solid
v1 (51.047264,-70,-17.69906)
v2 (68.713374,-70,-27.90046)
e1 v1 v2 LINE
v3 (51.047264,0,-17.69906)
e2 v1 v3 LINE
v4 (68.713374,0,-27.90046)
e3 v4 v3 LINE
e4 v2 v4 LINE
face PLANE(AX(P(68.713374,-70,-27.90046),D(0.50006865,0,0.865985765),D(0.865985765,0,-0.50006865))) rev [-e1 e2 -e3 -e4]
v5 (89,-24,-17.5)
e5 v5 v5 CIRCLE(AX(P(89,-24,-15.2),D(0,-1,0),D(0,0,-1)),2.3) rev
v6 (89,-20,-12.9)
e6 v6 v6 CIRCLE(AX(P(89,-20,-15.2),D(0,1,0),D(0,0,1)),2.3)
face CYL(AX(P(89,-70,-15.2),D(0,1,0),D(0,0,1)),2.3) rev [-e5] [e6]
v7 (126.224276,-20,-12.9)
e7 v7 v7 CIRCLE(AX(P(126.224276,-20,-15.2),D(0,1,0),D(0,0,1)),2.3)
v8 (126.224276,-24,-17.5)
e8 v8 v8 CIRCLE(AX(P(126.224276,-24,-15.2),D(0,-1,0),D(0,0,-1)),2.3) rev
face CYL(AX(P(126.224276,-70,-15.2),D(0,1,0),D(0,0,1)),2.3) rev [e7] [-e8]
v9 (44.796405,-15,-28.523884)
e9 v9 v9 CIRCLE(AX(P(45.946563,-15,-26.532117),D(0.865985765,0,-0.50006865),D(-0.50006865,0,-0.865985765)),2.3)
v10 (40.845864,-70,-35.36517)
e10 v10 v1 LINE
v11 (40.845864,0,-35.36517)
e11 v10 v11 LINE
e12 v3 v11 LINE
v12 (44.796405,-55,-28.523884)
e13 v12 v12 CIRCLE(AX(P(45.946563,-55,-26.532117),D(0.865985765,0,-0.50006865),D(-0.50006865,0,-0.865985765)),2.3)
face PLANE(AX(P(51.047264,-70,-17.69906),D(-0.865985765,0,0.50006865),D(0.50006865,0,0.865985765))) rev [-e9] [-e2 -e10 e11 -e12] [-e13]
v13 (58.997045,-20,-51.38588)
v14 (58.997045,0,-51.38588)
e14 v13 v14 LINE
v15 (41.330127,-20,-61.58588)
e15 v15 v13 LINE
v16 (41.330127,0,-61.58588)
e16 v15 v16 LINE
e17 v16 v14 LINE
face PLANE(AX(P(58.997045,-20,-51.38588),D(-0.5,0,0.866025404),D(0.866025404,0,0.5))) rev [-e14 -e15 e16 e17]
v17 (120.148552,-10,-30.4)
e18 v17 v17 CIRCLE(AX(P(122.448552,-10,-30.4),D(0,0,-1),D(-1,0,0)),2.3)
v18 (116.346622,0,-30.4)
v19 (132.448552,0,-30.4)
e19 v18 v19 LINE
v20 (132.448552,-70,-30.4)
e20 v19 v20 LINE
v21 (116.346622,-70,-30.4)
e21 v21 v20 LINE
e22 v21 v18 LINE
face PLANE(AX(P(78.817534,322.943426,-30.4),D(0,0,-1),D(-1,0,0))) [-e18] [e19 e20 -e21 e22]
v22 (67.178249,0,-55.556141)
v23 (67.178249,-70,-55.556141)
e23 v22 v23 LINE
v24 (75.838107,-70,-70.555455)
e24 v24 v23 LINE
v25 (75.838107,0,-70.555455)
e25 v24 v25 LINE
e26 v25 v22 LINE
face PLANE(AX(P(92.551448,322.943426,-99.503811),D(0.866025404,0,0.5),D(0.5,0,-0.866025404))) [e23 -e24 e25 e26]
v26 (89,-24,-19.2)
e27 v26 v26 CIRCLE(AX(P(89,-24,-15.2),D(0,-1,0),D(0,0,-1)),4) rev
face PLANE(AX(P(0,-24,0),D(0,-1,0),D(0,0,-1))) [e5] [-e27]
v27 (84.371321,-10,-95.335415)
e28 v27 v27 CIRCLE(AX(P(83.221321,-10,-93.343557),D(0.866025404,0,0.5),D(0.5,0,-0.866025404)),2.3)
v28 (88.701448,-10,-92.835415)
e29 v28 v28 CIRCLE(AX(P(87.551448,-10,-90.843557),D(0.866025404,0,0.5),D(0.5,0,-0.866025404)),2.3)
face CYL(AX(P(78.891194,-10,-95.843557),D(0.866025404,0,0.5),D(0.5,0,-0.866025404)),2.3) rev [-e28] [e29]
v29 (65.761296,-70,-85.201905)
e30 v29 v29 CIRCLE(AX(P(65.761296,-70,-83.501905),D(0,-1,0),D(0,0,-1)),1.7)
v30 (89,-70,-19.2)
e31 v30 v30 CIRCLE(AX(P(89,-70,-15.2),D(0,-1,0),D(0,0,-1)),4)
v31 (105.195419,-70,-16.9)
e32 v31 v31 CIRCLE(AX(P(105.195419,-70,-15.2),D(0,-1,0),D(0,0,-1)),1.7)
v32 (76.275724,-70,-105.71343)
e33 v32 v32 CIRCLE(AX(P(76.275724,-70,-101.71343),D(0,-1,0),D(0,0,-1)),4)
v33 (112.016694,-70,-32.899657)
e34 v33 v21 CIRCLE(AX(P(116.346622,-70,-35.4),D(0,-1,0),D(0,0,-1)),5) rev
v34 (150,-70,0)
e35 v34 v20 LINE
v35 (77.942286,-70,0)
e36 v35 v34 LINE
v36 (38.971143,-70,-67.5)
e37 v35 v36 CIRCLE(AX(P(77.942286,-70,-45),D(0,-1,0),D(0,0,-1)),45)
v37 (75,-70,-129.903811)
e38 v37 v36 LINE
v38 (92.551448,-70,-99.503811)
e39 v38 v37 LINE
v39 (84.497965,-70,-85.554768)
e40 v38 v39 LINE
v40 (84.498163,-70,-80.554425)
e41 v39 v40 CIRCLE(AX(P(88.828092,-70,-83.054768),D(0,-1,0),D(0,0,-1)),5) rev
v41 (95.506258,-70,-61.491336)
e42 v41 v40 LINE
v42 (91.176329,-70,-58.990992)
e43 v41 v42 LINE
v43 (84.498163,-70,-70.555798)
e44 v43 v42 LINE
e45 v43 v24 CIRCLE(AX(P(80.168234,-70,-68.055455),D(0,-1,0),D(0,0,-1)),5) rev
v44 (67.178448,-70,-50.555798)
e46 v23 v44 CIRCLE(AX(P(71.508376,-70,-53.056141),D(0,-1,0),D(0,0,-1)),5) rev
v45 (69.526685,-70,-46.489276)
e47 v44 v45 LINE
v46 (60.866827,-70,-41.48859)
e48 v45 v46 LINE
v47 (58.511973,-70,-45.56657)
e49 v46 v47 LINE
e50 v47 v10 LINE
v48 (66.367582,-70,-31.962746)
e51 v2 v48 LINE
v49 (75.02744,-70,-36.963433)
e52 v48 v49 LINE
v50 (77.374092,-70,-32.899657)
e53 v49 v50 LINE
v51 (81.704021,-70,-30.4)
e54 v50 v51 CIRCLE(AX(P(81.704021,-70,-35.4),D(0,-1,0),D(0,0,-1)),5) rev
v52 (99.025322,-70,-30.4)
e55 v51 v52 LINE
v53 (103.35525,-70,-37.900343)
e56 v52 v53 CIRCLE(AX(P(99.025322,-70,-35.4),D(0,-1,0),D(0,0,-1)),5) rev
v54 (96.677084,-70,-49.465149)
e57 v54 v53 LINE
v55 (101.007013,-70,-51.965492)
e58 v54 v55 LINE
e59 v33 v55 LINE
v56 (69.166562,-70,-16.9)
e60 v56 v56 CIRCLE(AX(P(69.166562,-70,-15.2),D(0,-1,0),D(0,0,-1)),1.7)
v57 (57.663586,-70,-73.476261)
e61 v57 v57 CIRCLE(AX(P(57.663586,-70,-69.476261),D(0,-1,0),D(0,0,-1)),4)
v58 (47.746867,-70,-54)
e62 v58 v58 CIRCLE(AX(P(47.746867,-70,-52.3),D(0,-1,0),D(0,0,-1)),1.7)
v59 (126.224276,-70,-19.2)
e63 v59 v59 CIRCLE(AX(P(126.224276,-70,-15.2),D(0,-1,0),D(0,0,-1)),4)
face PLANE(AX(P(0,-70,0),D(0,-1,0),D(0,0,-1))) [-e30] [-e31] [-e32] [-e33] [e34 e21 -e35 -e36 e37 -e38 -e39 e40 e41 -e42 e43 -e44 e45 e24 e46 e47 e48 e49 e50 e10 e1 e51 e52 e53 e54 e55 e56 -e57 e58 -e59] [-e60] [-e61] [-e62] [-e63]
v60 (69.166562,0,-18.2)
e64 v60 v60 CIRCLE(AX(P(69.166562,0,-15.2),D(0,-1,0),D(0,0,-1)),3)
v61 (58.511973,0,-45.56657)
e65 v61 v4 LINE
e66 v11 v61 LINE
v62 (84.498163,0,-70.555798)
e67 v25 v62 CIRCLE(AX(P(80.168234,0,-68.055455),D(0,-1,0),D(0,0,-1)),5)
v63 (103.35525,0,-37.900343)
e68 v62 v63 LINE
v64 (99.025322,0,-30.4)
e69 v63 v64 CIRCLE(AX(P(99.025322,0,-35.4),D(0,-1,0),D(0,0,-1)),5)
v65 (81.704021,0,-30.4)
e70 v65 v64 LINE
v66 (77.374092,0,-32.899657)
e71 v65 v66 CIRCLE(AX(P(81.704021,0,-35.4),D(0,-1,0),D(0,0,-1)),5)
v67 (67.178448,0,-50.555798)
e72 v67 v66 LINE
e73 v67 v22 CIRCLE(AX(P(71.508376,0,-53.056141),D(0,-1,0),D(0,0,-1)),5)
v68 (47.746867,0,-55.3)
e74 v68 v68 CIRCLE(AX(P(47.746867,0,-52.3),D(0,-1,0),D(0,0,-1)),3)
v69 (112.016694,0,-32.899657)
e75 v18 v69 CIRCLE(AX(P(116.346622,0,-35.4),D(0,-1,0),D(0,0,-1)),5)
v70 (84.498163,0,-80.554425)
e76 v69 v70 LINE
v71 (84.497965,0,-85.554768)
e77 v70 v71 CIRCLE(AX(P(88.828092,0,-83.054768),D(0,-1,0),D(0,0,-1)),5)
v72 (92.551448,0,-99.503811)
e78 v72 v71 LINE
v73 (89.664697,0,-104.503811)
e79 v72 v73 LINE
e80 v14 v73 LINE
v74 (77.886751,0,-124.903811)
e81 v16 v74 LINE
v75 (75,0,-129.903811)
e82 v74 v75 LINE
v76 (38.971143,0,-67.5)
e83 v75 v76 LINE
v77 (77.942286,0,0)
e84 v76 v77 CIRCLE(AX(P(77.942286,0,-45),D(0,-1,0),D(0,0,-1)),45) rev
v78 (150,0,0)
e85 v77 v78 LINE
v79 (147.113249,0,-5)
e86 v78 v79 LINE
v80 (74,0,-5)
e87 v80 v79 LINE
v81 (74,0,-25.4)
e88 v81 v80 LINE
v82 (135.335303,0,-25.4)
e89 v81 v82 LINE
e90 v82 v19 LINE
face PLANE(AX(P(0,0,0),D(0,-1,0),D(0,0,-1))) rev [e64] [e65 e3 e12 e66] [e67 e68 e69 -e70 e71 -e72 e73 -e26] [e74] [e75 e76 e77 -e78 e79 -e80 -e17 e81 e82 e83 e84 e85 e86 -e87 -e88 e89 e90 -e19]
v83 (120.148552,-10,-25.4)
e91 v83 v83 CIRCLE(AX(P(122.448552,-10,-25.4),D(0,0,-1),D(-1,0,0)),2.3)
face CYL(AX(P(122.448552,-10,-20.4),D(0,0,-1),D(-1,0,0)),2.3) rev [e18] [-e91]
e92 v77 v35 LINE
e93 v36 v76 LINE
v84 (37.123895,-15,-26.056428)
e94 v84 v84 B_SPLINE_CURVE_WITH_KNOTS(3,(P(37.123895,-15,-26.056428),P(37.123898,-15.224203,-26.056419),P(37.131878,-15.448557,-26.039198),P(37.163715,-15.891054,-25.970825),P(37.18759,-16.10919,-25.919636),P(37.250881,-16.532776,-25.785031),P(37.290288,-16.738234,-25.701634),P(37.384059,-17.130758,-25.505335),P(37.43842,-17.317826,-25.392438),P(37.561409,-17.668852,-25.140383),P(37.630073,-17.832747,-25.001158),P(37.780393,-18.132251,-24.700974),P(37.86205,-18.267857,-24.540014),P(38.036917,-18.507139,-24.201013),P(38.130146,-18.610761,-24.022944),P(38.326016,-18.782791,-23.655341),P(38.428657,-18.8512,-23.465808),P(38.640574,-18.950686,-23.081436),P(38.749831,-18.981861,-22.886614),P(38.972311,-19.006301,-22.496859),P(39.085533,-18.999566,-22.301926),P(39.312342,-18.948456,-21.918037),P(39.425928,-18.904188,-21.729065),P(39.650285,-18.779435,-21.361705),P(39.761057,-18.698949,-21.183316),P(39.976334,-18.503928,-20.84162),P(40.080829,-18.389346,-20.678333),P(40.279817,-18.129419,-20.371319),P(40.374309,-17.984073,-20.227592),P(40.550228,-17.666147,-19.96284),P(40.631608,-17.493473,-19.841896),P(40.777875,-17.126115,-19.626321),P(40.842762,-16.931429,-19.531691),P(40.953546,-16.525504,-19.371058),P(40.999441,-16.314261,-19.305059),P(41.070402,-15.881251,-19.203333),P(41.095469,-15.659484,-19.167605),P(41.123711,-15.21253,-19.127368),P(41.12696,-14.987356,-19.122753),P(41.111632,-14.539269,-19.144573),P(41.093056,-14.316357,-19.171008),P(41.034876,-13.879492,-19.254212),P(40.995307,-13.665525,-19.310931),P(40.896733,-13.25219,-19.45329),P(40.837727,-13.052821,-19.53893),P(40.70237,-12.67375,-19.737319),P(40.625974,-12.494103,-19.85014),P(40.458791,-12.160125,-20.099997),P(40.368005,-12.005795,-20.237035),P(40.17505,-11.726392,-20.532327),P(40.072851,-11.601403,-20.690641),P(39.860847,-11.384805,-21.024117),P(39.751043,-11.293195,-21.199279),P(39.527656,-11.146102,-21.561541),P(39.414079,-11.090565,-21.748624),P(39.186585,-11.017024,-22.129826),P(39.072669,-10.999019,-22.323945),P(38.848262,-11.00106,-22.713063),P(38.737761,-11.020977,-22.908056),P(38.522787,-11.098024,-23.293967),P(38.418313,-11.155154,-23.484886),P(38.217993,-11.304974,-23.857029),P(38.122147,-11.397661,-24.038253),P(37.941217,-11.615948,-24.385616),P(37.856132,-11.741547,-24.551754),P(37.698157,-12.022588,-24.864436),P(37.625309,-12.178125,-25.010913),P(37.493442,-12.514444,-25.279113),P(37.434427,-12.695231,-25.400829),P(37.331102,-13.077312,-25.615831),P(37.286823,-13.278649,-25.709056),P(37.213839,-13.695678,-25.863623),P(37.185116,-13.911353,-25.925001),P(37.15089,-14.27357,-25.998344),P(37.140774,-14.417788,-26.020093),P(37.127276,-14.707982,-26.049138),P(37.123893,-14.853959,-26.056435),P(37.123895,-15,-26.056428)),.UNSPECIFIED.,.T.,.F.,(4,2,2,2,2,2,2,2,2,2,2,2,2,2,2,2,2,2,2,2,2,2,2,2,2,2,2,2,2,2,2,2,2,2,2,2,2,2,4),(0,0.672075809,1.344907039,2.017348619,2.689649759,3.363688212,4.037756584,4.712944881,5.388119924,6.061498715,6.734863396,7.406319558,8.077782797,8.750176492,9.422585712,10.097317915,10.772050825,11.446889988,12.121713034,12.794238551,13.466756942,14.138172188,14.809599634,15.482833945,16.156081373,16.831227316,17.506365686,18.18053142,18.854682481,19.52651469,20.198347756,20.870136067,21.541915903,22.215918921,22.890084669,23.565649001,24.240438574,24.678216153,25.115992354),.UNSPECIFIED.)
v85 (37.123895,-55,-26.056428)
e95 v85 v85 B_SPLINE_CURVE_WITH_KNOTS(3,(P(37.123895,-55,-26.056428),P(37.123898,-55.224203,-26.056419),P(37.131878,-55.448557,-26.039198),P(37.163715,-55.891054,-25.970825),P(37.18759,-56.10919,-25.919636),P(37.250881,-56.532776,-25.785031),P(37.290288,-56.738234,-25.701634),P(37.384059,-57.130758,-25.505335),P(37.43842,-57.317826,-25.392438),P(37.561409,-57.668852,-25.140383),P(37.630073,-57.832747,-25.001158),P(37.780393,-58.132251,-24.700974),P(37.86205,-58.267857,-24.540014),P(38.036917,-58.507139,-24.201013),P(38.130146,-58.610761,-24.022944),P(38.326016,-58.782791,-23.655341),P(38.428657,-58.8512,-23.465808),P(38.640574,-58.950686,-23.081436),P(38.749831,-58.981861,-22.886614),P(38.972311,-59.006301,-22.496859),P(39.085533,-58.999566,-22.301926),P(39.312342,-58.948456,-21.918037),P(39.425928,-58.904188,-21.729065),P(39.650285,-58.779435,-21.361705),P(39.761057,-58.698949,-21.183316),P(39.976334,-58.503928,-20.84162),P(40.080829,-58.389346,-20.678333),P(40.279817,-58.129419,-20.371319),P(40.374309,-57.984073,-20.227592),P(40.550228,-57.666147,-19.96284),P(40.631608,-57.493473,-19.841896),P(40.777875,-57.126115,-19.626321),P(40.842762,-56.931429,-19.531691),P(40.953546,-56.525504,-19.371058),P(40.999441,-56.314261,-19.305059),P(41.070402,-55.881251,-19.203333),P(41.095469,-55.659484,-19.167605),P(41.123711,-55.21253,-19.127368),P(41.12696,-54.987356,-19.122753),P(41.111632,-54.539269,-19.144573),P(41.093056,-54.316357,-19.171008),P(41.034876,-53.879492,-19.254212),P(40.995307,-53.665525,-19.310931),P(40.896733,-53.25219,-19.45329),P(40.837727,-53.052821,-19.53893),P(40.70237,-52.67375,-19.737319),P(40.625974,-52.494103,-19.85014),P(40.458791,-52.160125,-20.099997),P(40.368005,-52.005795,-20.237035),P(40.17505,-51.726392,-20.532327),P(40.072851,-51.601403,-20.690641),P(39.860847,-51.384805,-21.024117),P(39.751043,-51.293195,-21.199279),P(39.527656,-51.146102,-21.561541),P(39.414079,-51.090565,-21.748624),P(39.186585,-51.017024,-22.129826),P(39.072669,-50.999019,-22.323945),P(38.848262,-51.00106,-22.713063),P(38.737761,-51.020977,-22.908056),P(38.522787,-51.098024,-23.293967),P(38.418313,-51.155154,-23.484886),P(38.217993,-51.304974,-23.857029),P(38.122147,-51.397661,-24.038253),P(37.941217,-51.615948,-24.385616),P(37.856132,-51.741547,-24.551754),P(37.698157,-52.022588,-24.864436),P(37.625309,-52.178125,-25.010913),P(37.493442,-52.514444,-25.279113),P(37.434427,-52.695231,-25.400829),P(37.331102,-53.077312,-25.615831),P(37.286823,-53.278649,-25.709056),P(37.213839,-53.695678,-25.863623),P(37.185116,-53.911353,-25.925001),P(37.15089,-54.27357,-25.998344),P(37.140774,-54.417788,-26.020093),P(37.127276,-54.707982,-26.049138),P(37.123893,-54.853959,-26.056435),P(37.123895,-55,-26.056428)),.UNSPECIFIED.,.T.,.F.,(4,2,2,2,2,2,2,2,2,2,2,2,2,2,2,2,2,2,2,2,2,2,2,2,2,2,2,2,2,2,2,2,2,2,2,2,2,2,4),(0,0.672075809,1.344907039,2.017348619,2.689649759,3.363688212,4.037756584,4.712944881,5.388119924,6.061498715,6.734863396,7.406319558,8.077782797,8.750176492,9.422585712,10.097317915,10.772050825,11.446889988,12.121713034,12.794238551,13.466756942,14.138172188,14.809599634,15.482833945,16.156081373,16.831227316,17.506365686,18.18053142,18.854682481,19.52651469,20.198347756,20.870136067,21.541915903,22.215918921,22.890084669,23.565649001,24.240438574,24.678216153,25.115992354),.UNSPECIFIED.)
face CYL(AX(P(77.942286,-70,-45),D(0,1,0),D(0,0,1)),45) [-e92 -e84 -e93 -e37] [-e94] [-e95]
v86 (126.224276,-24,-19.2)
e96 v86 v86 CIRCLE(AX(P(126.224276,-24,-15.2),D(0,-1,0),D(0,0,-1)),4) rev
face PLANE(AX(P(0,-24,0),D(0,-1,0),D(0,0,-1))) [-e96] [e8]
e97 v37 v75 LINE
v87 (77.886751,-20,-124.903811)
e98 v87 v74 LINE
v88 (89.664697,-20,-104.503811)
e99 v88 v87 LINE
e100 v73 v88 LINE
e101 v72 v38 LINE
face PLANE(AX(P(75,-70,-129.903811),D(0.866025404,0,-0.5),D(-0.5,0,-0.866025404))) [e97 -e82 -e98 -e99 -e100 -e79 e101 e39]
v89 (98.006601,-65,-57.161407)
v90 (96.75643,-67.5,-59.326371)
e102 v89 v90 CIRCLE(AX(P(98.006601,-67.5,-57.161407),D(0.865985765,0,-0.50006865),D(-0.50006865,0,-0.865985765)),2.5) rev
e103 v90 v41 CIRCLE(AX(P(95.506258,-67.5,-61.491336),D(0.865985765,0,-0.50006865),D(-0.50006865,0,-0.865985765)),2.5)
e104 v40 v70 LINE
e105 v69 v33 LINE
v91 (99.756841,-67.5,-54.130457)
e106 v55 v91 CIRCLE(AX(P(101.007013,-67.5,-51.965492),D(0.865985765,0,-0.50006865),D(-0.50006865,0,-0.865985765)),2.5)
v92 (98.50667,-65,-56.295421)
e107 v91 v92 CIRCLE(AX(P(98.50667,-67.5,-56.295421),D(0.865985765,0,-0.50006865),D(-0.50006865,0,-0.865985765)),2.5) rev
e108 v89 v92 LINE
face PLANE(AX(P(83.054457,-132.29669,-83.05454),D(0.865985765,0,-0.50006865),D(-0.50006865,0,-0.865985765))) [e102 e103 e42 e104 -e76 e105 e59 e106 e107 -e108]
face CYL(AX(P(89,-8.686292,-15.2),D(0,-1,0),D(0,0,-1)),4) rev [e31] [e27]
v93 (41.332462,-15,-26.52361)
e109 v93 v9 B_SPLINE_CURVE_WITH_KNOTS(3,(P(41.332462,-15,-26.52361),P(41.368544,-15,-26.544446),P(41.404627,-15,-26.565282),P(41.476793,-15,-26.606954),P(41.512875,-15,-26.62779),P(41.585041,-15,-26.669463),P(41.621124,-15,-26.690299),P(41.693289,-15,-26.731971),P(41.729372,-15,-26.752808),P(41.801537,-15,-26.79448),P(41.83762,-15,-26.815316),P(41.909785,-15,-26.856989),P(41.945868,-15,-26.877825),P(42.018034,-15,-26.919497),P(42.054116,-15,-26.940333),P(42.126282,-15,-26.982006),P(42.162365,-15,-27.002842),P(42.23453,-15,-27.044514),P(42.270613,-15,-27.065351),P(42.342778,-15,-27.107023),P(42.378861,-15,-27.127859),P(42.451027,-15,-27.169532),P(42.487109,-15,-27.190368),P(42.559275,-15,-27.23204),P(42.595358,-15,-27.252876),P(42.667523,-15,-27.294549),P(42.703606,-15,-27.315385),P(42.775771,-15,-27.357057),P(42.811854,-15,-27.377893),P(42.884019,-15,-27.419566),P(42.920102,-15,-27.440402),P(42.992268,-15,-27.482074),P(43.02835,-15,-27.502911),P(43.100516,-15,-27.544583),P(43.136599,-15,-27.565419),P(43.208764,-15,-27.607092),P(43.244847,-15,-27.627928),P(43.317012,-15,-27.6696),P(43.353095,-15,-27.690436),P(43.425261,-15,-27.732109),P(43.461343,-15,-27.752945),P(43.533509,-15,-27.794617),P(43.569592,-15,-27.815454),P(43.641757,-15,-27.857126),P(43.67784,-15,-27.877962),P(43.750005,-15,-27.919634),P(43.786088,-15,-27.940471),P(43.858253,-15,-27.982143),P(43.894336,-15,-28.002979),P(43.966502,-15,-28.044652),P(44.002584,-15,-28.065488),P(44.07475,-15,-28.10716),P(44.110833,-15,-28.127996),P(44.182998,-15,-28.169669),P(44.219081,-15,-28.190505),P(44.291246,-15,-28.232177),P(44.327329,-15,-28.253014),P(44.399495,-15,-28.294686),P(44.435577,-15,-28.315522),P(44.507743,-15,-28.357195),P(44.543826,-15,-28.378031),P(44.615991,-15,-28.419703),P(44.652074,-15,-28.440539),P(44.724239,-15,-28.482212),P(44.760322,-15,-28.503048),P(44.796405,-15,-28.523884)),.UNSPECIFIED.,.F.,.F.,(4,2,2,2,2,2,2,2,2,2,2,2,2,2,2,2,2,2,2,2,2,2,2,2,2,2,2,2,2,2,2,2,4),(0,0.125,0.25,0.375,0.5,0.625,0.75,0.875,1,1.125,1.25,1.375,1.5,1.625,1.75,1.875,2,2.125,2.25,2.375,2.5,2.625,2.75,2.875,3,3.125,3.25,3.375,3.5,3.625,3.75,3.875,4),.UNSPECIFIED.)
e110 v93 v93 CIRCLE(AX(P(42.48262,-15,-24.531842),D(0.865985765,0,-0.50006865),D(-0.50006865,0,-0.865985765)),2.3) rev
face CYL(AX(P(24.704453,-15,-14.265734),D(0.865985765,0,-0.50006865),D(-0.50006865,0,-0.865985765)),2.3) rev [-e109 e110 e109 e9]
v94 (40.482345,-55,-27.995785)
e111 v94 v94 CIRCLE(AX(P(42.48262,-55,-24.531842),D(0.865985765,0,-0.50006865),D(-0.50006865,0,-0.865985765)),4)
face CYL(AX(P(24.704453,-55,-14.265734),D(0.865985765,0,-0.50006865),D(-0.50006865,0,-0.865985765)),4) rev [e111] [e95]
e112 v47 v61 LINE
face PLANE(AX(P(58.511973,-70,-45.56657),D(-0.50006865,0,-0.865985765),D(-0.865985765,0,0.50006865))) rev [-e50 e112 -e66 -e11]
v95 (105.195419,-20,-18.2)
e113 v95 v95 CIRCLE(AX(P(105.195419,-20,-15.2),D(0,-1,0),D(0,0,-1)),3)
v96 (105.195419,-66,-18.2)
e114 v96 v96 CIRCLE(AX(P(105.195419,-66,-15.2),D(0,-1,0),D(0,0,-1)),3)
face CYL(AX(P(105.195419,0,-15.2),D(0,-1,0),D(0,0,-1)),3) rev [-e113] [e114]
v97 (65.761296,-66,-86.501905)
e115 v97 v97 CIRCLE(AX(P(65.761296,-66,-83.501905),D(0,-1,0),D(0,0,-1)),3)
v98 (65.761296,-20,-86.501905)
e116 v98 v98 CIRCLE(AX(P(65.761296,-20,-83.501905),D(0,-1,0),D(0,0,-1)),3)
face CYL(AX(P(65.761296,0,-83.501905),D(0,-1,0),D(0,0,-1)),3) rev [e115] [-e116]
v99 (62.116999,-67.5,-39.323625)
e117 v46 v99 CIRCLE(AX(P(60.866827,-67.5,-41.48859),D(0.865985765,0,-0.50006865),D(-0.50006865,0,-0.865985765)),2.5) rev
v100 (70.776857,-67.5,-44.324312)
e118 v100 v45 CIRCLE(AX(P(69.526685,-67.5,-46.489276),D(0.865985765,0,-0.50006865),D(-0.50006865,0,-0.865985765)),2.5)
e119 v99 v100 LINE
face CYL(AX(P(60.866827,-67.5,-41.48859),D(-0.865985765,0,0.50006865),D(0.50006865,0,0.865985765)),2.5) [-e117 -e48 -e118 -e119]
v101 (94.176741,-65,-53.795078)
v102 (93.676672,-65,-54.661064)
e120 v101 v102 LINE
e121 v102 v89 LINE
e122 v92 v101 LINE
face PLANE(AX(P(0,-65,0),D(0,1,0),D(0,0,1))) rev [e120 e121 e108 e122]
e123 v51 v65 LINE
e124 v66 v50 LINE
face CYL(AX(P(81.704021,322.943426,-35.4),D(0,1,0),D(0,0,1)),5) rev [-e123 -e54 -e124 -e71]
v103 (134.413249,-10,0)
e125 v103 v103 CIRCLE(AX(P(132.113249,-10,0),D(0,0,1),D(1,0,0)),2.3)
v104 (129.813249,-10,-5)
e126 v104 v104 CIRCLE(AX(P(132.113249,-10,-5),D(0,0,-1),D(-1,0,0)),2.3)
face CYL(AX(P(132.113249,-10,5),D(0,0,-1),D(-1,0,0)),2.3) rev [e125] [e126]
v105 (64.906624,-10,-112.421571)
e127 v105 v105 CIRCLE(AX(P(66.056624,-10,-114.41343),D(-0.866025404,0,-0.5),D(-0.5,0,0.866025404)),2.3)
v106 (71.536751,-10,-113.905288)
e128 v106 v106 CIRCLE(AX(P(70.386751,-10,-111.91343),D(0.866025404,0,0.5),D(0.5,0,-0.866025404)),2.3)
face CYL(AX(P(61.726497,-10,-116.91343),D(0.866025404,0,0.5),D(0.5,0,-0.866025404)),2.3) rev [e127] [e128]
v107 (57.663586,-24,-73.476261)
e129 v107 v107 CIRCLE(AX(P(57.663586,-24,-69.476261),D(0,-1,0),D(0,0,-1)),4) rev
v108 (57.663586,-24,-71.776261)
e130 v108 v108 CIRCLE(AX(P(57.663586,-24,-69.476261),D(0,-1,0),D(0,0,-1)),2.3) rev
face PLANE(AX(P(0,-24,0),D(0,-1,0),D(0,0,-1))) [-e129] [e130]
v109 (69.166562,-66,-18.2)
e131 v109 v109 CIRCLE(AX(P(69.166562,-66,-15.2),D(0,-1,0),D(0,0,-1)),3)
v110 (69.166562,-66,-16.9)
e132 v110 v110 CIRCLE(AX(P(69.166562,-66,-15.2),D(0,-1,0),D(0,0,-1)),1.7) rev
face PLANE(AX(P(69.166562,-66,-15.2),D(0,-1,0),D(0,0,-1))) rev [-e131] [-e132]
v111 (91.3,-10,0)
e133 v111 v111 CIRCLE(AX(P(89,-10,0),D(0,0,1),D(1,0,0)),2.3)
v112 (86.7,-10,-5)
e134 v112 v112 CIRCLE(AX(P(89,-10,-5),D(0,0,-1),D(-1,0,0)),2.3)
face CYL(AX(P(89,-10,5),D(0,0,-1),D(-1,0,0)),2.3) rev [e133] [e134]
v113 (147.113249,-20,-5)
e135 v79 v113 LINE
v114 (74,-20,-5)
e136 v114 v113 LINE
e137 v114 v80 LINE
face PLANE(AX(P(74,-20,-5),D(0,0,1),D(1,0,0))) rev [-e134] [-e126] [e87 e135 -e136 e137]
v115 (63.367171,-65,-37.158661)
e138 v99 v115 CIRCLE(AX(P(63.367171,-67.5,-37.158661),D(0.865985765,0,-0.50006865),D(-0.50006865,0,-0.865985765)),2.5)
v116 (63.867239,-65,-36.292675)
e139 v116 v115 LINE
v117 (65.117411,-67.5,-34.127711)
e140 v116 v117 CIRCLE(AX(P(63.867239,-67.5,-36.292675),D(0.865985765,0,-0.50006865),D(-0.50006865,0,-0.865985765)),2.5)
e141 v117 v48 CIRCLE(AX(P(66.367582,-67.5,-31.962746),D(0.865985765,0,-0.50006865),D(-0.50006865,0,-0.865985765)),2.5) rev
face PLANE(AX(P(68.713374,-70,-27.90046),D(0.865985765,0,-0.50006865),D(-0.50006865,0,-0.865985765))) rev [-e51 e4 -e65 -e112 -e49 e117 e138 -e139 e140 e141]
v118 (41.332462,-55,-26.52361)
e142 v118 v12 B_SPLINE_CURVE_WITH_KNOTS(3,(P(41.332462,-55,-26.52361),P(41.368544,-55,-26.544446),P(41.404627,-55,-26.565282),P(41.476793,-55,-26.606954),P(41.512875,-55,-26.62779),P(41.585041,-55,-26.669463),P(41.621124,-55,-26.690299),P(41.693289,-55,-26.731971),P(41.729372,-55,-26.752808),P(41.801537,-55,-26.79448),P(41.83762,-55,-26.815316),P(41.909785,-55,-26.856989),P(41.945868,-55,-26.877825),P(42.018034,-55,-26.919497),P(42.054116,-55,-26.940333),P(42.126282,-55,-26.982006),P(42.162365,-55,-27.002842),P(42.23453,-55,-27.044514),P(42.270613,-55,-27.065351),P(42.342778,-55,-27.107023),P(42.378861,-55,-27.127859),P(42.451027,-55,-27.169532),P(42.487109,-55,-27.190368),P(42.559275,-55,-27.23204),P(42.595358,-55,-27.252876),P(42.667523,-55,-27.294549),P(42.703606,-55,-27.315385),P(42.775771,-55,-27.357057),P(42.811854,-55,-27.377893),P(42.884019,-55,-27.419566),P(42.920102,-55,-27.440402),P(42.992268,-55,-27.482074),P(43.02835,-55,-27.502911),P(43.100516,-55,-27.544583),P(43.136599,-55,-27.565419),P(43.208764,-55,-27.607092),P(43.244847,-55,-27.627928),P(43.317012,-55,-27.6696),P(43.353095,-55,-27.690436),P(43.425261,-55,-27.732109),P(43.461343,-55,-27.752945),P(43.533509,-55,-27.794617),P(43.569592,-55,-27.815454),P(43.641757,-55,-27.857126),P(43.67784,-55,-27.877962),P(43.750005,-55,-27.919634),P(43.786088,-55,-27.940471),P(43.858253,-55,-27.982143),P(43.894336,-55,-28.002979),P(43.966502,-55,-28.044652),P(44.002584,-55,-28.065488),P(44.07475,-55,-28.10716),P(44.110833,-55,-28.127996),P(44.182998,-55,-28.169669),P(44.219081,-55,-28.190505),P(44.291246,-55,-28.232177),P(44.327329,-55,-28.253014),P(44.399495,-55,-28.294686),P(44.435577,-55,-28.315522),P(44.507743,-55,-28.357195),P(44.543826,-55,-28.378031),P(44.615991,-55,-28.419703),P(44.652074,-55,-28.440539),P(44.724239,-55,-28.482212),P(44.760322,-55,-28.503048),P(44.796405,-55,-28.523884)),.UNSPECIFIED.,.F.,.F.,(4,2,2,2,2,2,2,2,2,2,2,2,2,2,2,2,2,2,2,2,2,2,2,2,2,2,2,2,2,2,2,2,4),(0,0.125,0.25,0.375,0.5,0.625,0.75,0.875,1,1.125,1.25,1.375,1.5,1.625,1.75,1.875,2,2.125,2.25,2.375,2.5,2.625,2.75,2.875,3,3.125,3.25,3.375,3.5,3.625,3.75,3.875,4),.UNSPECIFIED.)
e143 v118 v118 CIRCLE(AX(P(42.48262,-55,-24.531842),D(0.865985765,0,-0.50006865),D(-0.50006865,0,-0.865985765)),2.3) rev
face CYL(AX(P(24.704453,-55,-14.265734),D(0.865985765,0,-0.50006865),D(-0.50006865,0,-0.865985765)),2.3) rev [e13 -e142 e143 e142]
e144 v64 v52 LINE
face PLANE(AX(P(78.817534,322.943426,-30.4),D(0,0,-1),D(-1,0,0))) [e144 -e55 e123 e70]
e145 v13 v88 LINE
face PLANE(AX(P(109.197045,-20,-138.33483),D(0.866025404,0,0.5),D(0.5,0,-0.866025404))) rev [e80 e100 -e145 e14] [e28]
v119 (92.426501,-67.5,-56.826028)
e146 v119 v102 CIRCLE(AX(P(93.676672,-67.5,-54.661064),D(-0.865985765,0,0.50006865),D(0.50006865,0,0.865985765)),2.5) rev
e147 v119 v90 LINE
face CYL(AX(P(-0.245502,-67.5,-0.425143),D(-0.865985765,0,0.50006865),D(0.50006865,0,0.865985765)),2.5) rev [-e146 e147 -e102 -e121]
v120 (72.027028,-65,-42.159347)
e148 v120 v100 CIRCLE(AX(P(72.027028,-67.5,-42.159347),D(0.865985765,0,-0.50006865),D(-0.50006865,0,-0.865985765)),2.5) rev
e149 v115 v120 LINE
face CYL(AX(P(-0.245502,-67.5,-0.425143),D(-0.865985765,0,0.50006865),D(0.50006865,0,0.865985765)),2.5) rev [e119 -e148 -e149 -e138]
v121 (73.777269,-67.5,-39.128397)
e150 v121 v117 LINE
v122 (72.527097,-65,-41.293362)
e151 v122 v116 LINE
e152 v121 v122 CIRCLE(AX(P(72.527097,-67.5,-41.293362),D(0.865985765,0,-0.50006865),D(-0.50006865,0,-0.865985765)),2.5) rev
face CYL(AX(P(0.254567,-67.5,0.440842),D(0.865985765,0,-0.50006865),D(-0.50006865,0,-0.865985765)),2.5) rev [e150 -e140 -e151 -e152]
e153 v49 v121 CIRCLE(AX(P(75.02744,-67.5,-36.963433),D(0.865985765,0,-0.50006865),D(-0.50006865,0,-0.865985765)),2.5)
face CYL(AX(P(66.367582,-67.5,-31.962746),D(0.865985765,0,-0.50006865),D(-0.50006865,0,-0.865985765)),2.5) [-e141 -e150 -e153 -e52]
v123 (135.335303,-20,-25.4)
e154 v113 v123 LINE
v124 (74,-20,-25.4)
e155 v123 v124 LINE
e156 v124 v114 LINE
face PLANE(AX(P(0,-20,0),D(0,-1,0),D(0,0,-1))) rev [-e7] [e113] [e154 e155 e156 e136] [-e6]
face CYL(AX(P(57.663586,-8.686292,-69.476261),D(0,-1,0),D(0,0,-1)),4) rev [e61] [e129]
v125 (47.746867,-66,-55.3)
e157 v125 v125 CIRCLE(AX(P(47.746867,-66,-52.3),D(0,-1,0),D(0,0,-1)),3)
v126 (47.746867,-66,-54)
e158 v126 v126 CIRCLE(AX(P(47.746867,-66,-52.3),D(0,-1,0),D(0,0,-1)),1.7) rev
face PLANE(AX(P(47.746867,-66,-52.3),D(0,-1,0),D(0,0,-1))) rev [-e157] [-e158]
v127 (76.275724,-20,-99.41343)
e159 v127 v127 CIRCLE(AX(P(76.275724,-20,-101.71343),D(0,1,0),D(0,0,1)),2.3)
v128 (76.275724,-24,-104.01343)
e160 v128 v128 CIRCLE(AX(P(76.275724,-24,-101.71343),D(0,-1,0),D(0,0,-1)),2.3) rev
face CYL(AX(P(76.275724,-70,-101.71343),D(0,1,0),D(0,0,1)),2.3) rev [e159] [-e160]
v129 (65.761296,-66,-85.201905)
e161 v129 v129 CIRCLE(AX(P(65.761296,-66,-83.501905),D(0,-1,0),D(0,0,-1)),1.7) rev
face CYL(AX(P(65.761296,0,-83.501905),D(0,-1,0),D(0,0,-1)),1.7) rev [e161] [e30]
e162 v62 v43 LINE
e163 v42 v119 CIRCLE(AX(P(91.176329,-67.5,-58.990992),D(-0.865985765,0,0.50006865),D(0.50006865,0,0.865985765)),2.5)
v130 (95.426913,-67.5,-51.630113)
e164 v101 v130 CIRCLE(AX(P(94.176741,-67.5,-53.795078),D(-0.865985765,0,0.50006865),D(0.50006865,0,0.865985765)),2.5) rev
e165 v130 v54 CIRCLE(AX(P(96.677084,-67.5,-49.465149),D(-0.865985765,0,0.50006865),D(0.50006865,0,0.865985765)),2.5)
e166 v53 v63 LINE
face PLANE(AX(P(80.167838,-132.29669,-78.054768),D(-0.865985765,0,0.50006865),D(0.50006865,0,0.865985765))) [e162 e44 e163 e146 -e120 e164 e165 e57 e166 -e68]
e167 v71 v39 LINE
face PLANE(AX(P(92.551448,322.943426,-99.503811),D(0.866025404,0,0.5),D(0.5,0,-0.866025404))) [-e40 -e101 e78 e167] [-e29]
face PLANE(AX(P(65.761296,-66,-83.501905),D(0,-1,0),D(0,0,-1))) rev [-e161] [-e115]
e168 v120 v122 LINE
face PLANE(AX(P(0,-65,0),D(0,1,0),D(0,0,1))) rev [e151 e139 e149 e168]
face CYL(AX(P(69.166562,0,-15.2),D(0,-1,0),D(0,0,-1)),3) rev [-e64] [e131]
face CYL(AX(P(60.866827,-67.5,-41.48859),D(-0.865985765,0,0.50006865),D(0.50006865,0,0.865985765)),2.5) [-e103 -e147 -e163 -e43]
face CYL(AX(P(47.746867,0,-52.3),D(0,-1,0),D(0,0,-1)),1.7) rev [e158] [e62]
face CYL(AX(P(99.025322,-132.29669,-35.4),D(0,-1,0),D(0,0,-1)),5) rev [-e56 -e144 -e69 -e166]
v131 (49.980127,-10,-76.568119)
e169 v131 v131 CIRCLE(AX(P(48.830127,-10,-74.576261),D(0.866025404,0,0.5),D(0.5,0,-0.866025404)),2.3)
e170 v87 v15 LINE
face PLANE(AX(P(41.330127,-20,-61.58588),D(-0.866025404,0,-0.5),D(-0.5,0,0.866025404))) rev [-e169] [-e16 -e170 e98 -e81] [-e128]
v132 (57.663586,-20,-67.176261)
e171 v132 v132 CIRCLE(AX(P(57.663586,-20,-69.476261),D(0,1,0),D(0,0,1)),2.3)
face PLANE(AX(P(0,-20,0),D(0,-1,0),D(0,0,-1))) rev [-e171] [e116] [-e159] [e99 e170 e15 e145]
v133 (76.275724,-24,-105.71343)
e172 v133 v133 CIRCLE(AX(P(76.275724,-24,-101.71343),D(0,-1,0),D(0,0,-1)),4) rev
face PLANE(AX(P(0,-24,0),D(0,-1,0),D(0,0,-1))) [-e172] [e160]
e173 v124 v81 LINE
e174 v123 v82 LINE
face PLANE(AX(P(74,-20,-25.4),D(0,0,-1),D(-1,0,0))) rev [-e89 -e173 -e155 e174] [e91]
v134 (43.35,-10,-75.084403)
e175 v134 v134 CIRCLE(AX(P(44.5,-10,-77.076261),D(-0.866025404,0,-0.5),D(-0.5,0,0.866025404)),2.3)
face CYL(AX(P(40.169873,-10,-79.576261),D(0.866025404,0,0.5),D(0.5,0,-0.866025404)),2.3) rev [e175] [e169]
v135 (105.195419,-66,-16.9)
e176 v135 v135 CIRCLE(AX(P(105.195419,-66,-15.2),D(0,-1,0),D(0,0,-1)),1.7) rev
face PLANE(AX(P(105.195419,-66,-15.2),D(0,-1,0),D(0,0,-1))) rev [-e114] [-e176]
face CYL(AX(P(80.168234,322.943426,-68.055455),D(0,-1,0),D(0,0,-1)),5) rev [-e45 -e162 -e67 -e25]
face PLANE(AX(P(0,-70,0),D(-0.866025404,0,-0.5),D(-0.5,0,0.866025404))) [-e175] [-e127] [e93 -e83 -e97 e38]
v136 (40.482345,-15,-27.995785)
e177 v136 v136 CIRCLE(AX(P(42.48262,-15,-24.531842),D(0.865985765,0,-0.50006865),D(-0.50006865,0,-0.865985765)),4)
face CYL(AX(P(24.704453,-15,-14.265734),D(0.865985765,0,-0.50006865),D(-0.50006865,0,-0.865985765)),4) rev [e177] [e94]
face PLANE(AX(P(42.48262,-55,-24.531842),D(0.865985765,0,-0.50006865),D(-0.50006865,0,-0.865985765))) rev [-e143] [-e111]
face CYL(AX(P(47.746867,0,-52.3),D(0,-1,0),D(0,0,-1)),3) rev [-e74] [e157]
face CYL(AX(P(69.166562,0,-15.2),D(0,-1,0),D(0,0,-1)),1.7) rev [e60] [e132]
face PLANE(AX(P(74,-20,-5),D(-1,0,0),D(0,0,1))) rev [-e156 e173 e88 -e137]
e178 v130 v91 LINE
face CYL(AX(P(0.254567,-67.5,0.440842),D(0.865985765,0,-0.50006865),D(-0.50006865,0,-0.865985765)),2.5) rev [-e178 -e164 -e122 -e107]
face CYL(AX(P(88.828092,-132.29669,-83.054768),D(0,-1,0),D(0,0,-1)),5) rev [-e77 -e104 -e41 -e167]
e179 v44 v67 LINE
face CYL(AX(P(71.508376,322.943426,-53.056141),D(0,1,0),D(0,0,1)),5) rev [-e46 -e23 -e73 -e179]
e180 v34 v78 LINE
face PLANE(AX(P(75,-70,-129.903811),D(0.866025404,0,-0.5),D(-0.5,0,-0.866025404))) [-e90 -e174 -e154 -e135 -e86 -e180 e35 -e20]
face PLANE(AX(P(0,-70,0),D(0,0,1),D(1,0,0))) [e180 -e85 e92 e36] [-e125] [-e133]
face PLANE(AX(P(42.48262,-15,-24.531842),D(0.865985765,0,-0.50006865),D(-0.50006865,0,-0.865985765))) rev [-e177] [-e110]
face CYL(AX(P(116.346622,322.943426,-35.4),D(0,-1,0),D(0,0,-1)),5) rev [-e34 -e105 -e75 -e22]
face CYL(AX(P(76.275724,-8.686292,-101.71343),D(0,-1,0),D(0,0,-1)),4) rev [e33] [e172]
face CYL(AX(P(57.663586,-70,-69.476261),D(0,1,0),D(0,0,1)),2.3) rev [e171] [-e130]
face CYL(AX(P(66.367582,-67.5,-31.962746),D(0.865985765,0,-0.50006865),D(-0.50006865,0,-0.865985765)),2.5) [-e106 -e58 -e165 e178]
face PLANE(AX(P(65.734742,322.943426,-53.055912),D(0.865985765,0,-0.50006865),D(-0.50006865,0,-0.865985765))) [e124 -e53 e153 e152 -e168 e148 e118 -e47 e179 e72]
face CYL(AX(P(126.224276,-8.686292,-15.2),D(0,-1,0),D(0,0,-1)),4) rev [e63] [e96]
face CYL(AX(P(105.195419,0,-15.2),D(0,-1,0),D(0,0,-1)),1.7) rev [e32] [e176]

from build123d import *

# Parameters (mm, degrees)
BOSS_EXTRUDE1_DEPTH      = 70
CUT_EXTRUDE2_DEPTH       = 211.416254125
CUT_EXTRUDE2_DEPTH_BACK  = 211.416254125
SKETCH2_W                = 100.4
SKETCH2_H                = 20.4
CUT_EXTRUDE3_DEPTH       = 20
FILLET1_R                = 45
CUT_EXTRUDE4_DEPTH       = 211.416254125
CUT_EXTRUDE4_DEPTH_BACK  = 211.416254125
BOSS_EXTRUDE2_DEPTH      = 70
SKETCH33_R               = 2.3
CUT_EXTRUDE9_DEPTH       = 10
SKETCH34_R               = 2.3
CUT_EXTRUDE10_DEPTH      = 10
FILLET2_R                = 5
CUT_EXTRUDE6_DEPTH       = 5
FILLET3_START            = 72
FILLET3_DEPTH            = 42
FILLET3_START_2          = 73.456949031
FILLET3_2_DEPTH          = 10
FILLET3_START_3          = 108.456949031
FILLET3_3_DEPTH          = 5
SKETCH31_R               = 2.3
CUT_EXTRUDE7_DEPTH       = 10
SKETCH32_R               = 2.3
CUT_EXTRUDE8_DEPTH       = 10
SKETCH35_R               = 2.3
CUT_EXTRUDE11_DEPTH      = 163.520229183
SKETCH36_R               = 4
CUT_EXTRUDE12_DEPTH      = 167.02180224
CUT_EXTRUDE13_DEPTH      = 211.416254158
CUT_EXTRUDE13_DEPTH_BACK = 211.416254158
SKETCH37_R               = 1.7
SKETCH38_R               = 2.3
CUT_EXTRUDE14_DEPTH      = 205.633819321
SKETCH39_R               = 4
CUT_EXTRUDE15_DEPTH      = 46
SKETCH40_R               = 3
CUT_EXTRUDE16_DEPTH      = 210.119583046


with BuildPart() as part:
    # Sketch1 → Boss-Extrude1 (new body)
    with BuildSketch(Plane(origin=(0, 0, 0), x_dir=(1, 0, 0), z_dir=(0, 1, 0))):
        Polygon((0, 0), (150, 0), (75, 129.903810568), align=None)
    extrude(amount=-BOSS_EXTRUDE1_DEPTH)

    # Sketch4 → Cut-Extrude2 (cut, two sides: drawn at the far end of the back side and taken through both)
    with BuildSketch(Plane(origin=(0, 0, 0), x_dir=(1, 0, 0), z_dir=(0, 1, 0)).offset(-CUT_EXTRUDE2_DEPTH_BACK)):
        Polygon((58.511973189, 45.566570047), (40.845863577, 35.365169595), (51.047264029, 17.699059984), (68.713373641, 27.900460435), align=None)
    extrude(amount=CUT_EXTRUDE2_DEPTH + CUT_EXTRUDE2_DEPTH_BACK, mode=Mode.SUBTRACT)

    # Sketch2 → Cut-Extrude3 (cut)
    with BuildSketch(Plane(origin=(0, 0, 0), x_dir=(1, 0, 0), z_dir=(0, 1, 0))):
        Polygon((109.197045256, 138.33483042), (58.997045256, 51.38587988), (41.330127019, 61.58587988), (91.530127019, 148.53483042), align=None)
        with Locations((124.2, 15.2)):
            Rectangle(SKETCH2_W, SKETCH2_H)
    extrude(amount=-CUT_EXTRUDE3_DEPTH, mode=Mode.SUBTRACT)

    # Fillet1
    fillet1_edges = [part.edges().sort_by_distance(p)[0] for p in [
        (0, -35, 0),
    ]]
    fillet(fillet1_edges, radius=FILLET1_R)

    # Sketch27 → Cut-Extrude4 (cut, two sides: drawn at the far end of the back side and taken through both)
    with BuildSketch(Plane(origin=(0, 0, 0), x_dir=(1, 0, 0), z_dir=(0, 1, 0)).offset(-CUT_EXTRUDE4_DEPTH_BACK)):
        Polygon((238.272822489, 351.900634614), (92.551448183, 99.503810568), (65.734741667, 53.05591239), (78.81753352, 30.4), (132.448551817, 30.4), (423.891300428, 30.4), (928.68494852, 321.842748611), (743.066470581, 643.343383225), align=None)
    extrude(amount=CUT_EXTRUDE4_DEPTH + CUT_EXTRUDE4_DEPTH_BACK, mode=Mode.SUBTRACT)

    # Sketch28 → Boss-Extrude2 (add)
    with BuildSketch(Plane(origin=(0, 0, 0), x_dir=(1, 0, 0), z_dir=(0, 1, 0))):
        Polygon((83.054457118, 83.054539524), (113.460135283, 30.4), (107.686368323, 30.4), (80.167837876, 78.054768335), align=None)
    extrude(amount=-BOSS_EXTRUDE2_DEPTH)

    # Sketch33 → Cut-Extrude9 (cut)
    with BuildSketch(Plane(origin=(26.327172275, 0, 15.2), x_dir=(0.4999999999999997, 0, -0.8660254037844388), z_dir=(0.8660254037844389, 0, 0.49999999999999983))):
        with Locations((122.448551817, -10)):
            Circle(SKETCH33_R)
    extrude(amount=-CUT_EXTRUDE9_DEPTH, mode=Mode.SUBTRACT)

    # Sketch34 → Cut-Extrude10 (cut)
    with BuildSketch(Plane(origin=(0, 0, -30.4), x_dir=(-1, 0, 0), z_dir=(0, 0, -1))):
        with Locations((-122.448551817, -10)):
            Circle(SKETCH34_R)
    extrude(amount=-CUT_EXTRUDE10_DEPTH, mode=Mode.SUBTRACT)

    # Fillet2
    fillet2_edges = [part.edges().sort_by_distance(p)[0] for p in [
        (83.054457118, -35, -83.054539524),
        (80.167837876, -35, -78.054768335),
        (65.734741667, -35, -53.05591239),
        (78.81753352, -35, -30.4),
        (107.686368323, -35, -30.4),
        (113.460135283, -35, -30.4),
    ]]
    fillet(fillet2_edges, radius=FILLET2_R)

    # Sketch30 → Cut-Extrude6 (cut)
    with BuildSketch(Plane.XZ.offset(70)):
        Polygon((62.116998953, -39.323625207), (122.736002524, -74.32843068), (125.736414421, -69.132516088), (65.117410851, -34.127710616), align=None)
    extrude(amount=-CUT_EXTRUDE6_DEPTH, mode=Mode.SUBTRACT)

    # Fillet3: read off the stored shape, not the designer's step
    # Fillet3 outline → Fillet3 (cut)
    with BuildSketch(Plane(origin=(0, 0, 0), x_dir=(0.5000686496051991, 0, 0.8659857652883406), z_dir=(0.8659857652883404, 0, -0.5000686496051993)).offset(FILLET3_START)):
        with BuildLine():
            Line((-2.990935885, 70), (-5.490935885, 70))
            ThreePointArc((-5.490935885, 70), (-3.723168932, 69.267766953), (-2.990935885, 67.5))
            Line((-2.990935885, 67.5), (-2.990935885, 70))
        make_face()
        with BuildLine():
            Line((5.509064115, 70), (3.009064115, 70))
            Line((3.009064115, 70), (3.009064115, 67.5))
            ThreePointArc((3.009064115, 67.5), (3.741297162, 69.267766953), (5.509064115, 70))
        make_face()
    extrude(amount=FILLET3_DEPTH, mode=Mode.SUBTRACT)

    # Fillet3 2 outline → Fillet3 2 (add)
    with BuildSketch(Plane(origin=(0, 0, 0), x_dir=(0.5000686496051991, 0, 0.8659857652883406), z_dir=(0.8659857652883404, 0, -0.5000686496051993)).offset(FILLET3_START_2)):
        with BuildLine():
            ThreePointArc((-0.490935885, 65), (-2.258702838, 65.732233047), (-2.990935885, 67.5))
            Line((-2.990935885, 67.5), (-2.990935885, 65))
            Line((-2.990935885, 65), (-0.490935885, 65))
        make_face()
        with BuildLine():
            ThreePointArc((3.009064115, 67.5), (2.276831068, 65.732233047), (0.509064115, 65))
            Line((0.509064115, 65), (3.009064115, 65))
            Line((3.009064115, 65), (3.009064115, 67.5))
        make_face()
    extrude(amount=FILLET3_2_DEPTH)

    # Fillet3 3 outline → Fillet3 3 (add)
    with BuildSketch(Plane(origin=(0, 0, 0), x_dir=(0.5000686496051991, 0, 0.8659857652883406), z_dir=(0.8659857652883404, 0, -0.5000686496051993)).offset(FILLET3_START_3)):
        with BuildLine():
            ThreePointArc((-0.490935885, 65), (-2.258702838, 65.732233047), (-2.990935885, 67.5))
            Line((-2.990935885, 67.5), (-2.990935885, 65))
            Line((-2.990935885, 65), (-0.490935885, 65))
        make_face()
        with BuildLine():
            ThreePointArc((3.009064115, 67.5), (2.276831068, 65.732233047), (0.509064115, 65))
            Line((0.509064115, 65), (3.009064115, 65))
            Line((3.009064115, 65), (3.009064115, 67.5))
        make_face()
    extrude(amount=FILLET3_3_DEPTH)

    # Sketch31 → Cut-Extrude7 (cut)
    with BuildSketch(Plane(origin=(4.330127019, 0, 2.5), x_dir=(0.5000000000000019, 0, -0.8660254037844376), z_dir=(0.8660254037844376, 0, 0.5000000000000019))):
        with Locations((89, -10)):
            Circle(SKETCH31_R)
        with Locations((132.113248654, -10)):
            Circle(SKETCH31_R)
    extrude(amount=-CUT_EXTRUDE7_DEPTH, mode=Mode.SUBTRACT)

    # Sketch32 → Cut-Extrude8 (cut)
    with BuildSketch(Plane(origin=(0, 0, -5), x_dir=(-1, 0, 0), z_dir=(0, 0, -1))):
        with Locations((-132.113248654, -10)):
            Circle(SKETCH32_R)
        with Locations((-89, -10)):
            Circle(SKETCH32_R)
    extrude(amount=-CUT_EXTRUDE8_DEPTH, mode=Mode.SUBTRACT)

    # Sketch35 → Cut-Extrude11 (cut, through all)
    with BuildSketch(Plane(origin=(45.946562611, 0, -26.532116854), x_dir=(-0.5000686496051995, 0, -0.8659857652883403), z_dir=(0.8659857652883401, 0, -0.5000686496051994))):
        with Locations((0, -15)):
            Circle(SKETCH35_R)
        with Locations((0, -55)):
            Circle(SKETCH35_R)
    extrude(amount=-CUT_EXTRUDE11_DEPTH, mode=Mode.SUBTRACT)

    # Sketch36 → Cut-Extrude12 (cut, through all)
    with BuildSketch(Plane(origin=(42.482619549, 0, -24.531842256), x_dir=(-0.5000686496051995, 0, -0.8659857652883403), z_dir=(0.8659857652883401, 0, -0.5000686496051994))):
        with Locations((0, -15)):
            Circle(SKETCH36_R)
        with Locations((0, -55)):
            Circle(SKETCH36_R)
    extrude(amount=-CUT_EXTRUDE12_DEPTH, mode=Mode.SUBTRACT)

    # Sketch37 → Cut-Extrude13 (cut, two sides: drawn at the far end of the back side and taken through both)
    with BuildSketch(Plane.XZ.offset(70).offset(-CUT_EXTRUDE13_DEPTH_BACK)):
        with Locations(Location((69.166562249, -15.2, 0), (0, 0, 270))):
            Circle(SKETCH37_R)
        with Locations(Location((105.195419079, -15.2, 0), (0, 0, 270))):
            Circle(SKETCH37_R)
        with Locations(Location((47.746867262, -52.3, 0), (0, 0, 270))):
            Circle(SKETCH37_R)
        with Locations(Location((65.761295677, -83.501905284, 0), (0, 0, 270))):
            Circle(SKETCH37_R)
    extrude(amount=CUT_EXTRUDE13_DEPTH + CUT_EXTRUDE13_DEPTH_BACK, mode=Mode.SUBTRACT)

    # Sketch38 → Cut-Extrude14 (cut, through all)
    with BuildSketch(Plane(origin=(0, -20, 0), x_dir=(1, 0, 0), z_dir=(0, 1, 0))):
        with Locations(Location((89, 15.2, 0), (0, 0, 270))):
            Circle(SKETCH38_R)
        with Locations(Location((126.224275908, 15.2, 0), (0, 0, 270))):
            Circle(SKETCH38_R)
        with Locations(Location((76.275724092, 101.713429511, 0), (0, 0, 270))):
            Circle(SKETCH38_R)
        with Locations(Location((57.663586138, 69.476260937, 0), (0, 0, 270))):
            Circle(SKETCH38_R)
    extrude(amount=-CUT_EXTRUDE14_DEPTH, mode=Mode.SUBTRACT)

    # Sketch39 → Cut-Extrude15 (cut)
    with BuildSketch(Plane.XZ.offset(70)):
        with Locations(Location((89, -15.2, 0), (0, 0, 270))):
            Circle(SKETCH39_R)
        with Locations(Location((126.224275908, -15.2, 0), (0, 0, 270))):
            Circle(SKETCH39_R)
        with Locations(Location((57.663586138, -69.476260937, 0), (0, 0, 270))):
            Circle(SKETCH39_R)
        with Locations(Location((76.275724092, -101.713429511, 0), (0, 0, 270))):
            Circle(SKETCH39_R)
    extrude(amount=-CUT_EXTRUDE15_DEPTH, mode=Mode.SUBTRACT)

    # Sketch40 → Cut-Extrude16 (cut, through all)
    with BuildSketch(Plane(origin=(0, -66, 0), x_dir=(-1, 0, 0), z_dir=(0, -1, 0))):
        with Locations(Location((-65.761295677, 83.501905284, 0), (0, 0, 90))):
            Circle(SKETCH40_R)
        with Locations(Location((-47.746867262, 52.3, 0), (0, 0, 90))):
            Circle(SKETCH40_R)
        with Locations(Location((-69.166562249, 15.2, 0), (0, 0, 90))):
            Circle(SKETCH40_R)
        with Locations(Location((-105.195419079, 15.2, 0), (0, 0, 90))):
            Circle(SKETCH40_R)
    extrude(amount=-CUT_EXTRUDE16_DEPTH, mode=Mode.SUBTRACT)


solid = part.part
